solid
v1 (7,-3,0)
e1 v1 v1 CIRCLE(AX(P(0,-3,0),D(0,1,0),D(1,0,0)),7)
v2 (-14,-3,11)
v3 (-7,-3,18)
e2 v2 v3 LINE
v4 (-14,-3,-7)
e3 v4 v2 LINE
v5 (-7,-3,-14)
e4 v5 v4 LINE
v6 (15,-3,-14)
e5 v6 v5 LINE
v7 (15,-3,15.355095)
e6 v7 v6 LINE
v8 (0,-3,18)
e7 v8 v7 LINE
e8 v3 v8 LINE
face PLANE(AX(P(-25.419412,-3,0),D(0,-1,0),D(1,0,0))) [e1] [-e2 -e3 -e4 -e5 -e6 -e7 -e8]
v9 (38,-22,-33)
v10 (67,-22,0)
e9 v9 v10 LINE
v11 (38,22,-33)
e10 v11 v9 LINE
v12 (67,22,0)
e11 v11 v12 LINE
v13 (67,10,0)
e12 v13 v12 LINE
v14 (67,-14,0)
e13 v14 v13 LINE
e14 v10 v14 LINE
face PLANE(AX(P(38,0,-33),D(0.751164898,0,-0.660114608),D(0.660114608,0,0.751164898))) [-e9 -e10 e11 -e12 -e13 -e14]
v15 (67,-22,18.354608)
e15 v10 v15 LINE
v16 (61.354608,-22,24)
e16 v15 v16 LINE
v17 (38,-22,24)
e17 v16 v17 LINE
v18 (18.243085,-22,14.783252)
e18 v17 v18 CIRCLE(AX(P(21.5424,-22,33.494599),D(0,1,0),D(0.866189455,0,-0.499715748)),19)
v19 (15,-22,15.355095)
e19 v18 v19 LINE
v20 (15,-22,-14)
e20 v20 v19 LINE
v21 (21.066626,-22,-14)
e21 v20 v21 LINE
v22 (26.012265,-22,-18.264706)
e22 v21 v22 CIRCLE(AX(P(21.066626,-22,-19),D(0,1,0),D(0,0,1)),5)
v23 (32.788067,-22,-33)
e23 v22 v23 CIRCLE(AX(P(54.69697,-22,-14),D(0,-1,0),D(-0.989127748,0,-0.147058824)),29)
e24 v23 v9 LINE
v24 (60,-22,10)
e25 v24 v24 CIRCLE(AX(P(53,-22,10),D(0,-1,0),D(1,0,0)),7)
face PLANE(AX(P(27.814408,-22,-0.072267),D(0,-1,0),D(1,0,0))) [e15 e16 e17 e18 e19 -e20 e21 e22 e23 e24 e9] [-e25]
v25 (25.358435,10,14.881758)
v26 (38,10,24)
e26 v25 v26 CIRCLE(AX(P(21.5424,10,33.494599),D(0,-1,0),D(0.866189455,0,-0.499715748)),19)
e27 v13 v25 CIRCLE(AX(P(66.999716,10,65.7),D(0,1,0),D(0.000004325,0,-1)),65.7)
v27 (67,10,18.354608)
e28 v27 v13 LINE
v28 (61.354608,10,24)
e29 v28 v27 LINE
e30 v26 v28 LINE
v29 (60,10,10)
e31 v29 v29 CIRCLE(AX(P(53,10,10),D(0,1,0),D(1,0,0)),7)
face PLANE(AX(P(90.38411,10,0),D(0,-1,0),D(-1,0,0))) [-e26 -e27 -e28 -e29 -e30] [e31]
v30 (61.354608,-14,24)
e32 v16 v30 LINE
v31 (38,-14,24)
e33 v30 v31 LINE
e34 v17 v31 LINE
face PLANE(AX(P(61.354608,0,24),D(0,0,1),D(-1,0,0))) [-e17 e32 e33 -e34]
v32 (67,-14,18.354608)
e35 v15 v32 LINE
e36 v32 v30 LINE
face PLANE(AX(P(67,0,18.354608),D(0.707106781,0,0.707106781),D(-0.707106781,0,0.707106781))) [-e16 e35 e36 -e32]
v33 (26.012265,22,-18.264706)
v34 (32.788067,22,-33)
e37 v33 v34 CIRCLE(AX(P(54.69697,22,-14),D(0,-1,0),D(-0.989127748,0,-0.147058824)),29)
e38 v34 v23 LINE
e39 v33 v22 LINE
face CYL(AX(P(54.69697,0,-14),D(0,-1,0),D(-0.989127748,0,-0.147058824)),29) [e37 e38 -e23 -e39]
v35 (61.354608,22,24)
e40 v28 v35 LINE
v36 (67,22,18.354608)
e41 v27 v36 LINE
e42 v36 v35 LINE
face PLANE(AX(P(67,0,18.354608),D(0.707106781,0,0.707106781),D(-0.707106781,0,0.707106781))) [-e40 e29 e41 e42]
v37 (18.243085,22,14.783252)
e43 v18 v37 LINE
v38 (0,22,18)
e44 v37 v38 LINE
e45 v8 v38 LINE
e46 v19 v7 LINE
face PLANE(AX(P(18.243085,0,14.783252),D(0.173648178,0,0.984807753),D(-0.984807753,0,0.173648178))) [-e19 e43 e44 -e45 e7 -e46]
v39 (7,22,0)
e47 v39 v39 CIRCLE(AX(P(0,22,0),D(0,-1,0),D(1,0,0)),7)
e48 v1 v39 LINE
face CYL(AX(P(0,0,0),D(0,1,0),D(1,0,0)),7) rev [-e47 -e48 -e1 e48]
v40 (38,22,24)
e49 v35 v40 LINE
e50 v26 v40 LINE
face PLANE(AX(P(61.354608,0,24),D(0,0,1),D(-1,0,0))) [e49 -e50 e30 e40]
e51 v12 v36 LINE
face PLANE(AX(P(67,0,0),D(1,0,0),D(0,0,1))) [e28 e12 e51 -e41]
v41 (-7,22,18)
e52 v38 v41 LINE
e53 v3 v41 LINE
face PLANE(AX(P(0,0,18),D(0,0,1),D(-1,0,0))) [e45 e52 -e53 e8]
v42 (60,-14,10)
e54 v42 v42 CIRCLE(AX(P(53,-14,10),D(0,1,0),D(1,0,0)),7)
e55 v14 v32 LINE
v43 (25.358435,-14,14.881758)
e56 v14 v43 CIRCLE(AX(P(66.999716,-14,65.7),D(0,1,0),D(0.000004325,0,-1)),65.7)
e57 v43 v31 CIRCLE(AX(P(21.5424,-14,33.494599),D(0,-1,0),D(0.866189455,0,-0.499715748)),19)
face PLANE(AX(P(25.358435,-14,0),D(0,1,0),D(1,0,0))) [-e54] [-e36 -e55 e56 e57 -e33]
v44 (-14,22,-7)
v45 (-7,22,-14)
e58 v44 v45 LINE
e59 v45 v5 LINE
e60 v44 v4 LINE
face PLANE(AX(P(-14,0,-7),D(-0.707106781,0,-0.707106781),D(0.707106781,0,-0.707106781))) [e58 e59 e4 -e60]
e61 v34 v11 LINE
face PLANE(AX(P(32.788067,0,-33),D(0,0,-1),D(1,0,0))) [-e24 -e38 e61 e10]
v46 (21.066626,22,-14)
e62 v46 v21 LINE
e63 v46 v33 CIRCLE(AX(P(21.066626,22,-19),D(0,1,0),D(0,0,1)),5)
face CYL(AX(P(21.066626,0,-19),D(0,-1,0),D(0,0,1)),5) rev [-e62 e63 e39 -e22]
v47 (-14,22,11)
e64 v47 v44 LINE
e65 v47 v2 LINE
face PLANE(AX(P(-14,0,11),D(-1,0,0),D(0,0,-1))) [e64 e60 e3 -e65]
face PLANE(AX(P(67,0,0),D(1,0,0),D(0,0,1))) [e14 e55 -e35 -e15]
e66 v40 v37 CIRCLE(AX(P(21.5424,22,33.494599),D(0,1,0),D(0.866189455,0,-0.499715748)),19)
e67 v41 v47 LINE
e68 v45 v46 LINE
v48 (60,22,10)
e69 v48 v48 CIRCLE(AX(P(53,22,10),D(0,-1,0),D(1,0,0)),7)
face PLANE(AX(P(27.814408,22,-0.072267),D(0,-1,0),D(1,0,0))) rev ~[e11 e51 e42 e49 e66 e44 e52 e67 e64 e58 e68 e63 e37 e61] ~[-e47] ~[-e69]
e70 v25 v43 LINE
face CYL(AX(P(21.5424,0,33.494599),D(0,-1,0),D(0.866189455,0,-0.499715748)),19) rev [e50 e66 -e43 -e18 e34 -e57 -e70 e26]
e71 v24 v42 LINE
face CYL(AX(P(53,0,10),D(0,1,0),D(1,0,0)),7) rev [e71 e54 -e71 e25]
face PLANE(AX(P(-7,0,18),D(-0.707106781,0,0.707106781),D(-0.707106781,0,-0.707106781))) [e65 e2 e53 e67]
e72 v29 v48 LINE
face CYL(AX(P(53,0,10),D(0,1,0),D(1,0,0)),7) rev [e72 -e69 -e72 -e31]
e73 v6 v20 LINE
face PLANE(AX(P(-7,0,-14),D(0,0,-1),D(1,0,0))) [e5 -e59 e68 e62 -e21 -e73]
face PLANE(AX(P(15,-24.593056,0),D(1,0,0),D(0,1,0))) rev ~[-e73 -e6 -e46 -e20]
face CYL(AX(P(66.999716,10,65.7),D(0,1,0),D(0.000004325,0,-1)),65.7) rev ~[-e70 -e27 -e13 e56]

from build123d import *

# Parameters (mm, degrees)
F0_R        = 7
F1_DEPTH    = 22
F3_DEPTH    = 69.1
F4_T4_DEPTH = 24
F2_W        = 40.4194121808
F2_H        = 21.5930561535
F5_DEPTH    = 72.2


# Not quite as in the source:
# - a fillet or chamfer that OpenCascade refuses, or shapes differently, is made with other operations: its cross-section is extruded or revolved along the edge and cut away or added


with BuildPart() as f1:
    # F0 (on Front) → F1 (new body, symmetric)
    with BuildSketch(Plane.XZ):
        with BuildLine():
            Line((-7, 18), (-14, 11))
            Line((-14, 11), (-14, -7))
            Line((-14, -7), (-7, -14))
            Line((-7, -14), (21.0666262554, -14))
            ThreePointArc((21.0666262554, -14), (24.3318620364, -15.2134137678), (26.0122649968, -18.2647058824))
            ThreePointArc((26.0122649968, -18.2647058824), (28.3490951999, -26.115672061), (32.7880673968, -33))
            Line((32.7880673968, -33), (38, -33))
            Line((38, -33), (67, 0))
            Line((67, 0), (67, 18.3546076061))
            Line((67, 18.3546076061), (61.3546076061, 24))
            Line((61.3546076061, 24), (38, 24))
            ThreePointArc((38, 24), (29.5749729609, 16.2760691513), (18.2430849879, 14.7832519053))
            Line((18.2430849879, 14.7832519053), (0, 18))
            Line((0, 18), (-7, 18))
        make_face()
        Circle(F0_R, mode=Mode.SUBTRACT)
        with Locations((53, 10)):
            Circle(F0_R, mode=Mode.SUBTRACT)
    extrude(amount=F1_DEPTH, both=True)

    # F2 (on Top) → F3 (cut)
    with BuildSketch(Plane.XY):
        Polygon((90.3841100792, -14), (90.3841100792, 10), (25.3584354958, 10), (25.3584354958, -14), (86.1629769206, -14), align=None)
    extrude(amount=F3_DEPTH, mode=Mode.SUBTRACT)

    # F4: fillet of radius 65.7 on 1 edges, made by hand


with BuildPart() as f4_tool2:
    # F4_s3 → F4_t4 (new body)
    with BuildSketch(Plane.XZ.offset(-10)):
        with BuildLine():
            ThreePointArc((67, 0), (44.8895413168, 3.8321555148), (25.3584354958, 14.88175752))
            Line((25.3584354958, 14.88175752), (24.5256098882, 13.8653926704))
            ThreePointArc((24.5256098882, 13.8653926704), (24.0444354958, 7.44087876), (24.0444354958, 0))
            Line((24.0444354958, 0), (25.3584354958, -1.314))
            Line((25.3584354958, -1.314), (67.0000056826, -1.314))
            Line((67.0000056826, -1.314), (67, 0))
        make_face()
    extrude(amount=F4_T4_DEPTH)

    split(bisect_by=Plane(origin=(37.8046632124, 0, -33.2222797927), x_dir=(0, 1, 0), z_dir=(-0.7511648984, 0, 0.6601146077)), keep=Keep.TOP)


with BuildPart() as f1_1:
    add(f1.part)

    # F4_t1: union F4_tool2
    add(f4_tool2.part)

    # F2 (on Top) → F5 (cut, symmetric)
    with BuildSketch(Plane.XY):
        with Locations((-5.2097060904, -13.7965280768)):
            Rectangle(F2_W, F2_H)
    extrude(amount=F5_DEPTH, both=True, mode=Mode.SUBTRACT)


solid = f1_1.part
